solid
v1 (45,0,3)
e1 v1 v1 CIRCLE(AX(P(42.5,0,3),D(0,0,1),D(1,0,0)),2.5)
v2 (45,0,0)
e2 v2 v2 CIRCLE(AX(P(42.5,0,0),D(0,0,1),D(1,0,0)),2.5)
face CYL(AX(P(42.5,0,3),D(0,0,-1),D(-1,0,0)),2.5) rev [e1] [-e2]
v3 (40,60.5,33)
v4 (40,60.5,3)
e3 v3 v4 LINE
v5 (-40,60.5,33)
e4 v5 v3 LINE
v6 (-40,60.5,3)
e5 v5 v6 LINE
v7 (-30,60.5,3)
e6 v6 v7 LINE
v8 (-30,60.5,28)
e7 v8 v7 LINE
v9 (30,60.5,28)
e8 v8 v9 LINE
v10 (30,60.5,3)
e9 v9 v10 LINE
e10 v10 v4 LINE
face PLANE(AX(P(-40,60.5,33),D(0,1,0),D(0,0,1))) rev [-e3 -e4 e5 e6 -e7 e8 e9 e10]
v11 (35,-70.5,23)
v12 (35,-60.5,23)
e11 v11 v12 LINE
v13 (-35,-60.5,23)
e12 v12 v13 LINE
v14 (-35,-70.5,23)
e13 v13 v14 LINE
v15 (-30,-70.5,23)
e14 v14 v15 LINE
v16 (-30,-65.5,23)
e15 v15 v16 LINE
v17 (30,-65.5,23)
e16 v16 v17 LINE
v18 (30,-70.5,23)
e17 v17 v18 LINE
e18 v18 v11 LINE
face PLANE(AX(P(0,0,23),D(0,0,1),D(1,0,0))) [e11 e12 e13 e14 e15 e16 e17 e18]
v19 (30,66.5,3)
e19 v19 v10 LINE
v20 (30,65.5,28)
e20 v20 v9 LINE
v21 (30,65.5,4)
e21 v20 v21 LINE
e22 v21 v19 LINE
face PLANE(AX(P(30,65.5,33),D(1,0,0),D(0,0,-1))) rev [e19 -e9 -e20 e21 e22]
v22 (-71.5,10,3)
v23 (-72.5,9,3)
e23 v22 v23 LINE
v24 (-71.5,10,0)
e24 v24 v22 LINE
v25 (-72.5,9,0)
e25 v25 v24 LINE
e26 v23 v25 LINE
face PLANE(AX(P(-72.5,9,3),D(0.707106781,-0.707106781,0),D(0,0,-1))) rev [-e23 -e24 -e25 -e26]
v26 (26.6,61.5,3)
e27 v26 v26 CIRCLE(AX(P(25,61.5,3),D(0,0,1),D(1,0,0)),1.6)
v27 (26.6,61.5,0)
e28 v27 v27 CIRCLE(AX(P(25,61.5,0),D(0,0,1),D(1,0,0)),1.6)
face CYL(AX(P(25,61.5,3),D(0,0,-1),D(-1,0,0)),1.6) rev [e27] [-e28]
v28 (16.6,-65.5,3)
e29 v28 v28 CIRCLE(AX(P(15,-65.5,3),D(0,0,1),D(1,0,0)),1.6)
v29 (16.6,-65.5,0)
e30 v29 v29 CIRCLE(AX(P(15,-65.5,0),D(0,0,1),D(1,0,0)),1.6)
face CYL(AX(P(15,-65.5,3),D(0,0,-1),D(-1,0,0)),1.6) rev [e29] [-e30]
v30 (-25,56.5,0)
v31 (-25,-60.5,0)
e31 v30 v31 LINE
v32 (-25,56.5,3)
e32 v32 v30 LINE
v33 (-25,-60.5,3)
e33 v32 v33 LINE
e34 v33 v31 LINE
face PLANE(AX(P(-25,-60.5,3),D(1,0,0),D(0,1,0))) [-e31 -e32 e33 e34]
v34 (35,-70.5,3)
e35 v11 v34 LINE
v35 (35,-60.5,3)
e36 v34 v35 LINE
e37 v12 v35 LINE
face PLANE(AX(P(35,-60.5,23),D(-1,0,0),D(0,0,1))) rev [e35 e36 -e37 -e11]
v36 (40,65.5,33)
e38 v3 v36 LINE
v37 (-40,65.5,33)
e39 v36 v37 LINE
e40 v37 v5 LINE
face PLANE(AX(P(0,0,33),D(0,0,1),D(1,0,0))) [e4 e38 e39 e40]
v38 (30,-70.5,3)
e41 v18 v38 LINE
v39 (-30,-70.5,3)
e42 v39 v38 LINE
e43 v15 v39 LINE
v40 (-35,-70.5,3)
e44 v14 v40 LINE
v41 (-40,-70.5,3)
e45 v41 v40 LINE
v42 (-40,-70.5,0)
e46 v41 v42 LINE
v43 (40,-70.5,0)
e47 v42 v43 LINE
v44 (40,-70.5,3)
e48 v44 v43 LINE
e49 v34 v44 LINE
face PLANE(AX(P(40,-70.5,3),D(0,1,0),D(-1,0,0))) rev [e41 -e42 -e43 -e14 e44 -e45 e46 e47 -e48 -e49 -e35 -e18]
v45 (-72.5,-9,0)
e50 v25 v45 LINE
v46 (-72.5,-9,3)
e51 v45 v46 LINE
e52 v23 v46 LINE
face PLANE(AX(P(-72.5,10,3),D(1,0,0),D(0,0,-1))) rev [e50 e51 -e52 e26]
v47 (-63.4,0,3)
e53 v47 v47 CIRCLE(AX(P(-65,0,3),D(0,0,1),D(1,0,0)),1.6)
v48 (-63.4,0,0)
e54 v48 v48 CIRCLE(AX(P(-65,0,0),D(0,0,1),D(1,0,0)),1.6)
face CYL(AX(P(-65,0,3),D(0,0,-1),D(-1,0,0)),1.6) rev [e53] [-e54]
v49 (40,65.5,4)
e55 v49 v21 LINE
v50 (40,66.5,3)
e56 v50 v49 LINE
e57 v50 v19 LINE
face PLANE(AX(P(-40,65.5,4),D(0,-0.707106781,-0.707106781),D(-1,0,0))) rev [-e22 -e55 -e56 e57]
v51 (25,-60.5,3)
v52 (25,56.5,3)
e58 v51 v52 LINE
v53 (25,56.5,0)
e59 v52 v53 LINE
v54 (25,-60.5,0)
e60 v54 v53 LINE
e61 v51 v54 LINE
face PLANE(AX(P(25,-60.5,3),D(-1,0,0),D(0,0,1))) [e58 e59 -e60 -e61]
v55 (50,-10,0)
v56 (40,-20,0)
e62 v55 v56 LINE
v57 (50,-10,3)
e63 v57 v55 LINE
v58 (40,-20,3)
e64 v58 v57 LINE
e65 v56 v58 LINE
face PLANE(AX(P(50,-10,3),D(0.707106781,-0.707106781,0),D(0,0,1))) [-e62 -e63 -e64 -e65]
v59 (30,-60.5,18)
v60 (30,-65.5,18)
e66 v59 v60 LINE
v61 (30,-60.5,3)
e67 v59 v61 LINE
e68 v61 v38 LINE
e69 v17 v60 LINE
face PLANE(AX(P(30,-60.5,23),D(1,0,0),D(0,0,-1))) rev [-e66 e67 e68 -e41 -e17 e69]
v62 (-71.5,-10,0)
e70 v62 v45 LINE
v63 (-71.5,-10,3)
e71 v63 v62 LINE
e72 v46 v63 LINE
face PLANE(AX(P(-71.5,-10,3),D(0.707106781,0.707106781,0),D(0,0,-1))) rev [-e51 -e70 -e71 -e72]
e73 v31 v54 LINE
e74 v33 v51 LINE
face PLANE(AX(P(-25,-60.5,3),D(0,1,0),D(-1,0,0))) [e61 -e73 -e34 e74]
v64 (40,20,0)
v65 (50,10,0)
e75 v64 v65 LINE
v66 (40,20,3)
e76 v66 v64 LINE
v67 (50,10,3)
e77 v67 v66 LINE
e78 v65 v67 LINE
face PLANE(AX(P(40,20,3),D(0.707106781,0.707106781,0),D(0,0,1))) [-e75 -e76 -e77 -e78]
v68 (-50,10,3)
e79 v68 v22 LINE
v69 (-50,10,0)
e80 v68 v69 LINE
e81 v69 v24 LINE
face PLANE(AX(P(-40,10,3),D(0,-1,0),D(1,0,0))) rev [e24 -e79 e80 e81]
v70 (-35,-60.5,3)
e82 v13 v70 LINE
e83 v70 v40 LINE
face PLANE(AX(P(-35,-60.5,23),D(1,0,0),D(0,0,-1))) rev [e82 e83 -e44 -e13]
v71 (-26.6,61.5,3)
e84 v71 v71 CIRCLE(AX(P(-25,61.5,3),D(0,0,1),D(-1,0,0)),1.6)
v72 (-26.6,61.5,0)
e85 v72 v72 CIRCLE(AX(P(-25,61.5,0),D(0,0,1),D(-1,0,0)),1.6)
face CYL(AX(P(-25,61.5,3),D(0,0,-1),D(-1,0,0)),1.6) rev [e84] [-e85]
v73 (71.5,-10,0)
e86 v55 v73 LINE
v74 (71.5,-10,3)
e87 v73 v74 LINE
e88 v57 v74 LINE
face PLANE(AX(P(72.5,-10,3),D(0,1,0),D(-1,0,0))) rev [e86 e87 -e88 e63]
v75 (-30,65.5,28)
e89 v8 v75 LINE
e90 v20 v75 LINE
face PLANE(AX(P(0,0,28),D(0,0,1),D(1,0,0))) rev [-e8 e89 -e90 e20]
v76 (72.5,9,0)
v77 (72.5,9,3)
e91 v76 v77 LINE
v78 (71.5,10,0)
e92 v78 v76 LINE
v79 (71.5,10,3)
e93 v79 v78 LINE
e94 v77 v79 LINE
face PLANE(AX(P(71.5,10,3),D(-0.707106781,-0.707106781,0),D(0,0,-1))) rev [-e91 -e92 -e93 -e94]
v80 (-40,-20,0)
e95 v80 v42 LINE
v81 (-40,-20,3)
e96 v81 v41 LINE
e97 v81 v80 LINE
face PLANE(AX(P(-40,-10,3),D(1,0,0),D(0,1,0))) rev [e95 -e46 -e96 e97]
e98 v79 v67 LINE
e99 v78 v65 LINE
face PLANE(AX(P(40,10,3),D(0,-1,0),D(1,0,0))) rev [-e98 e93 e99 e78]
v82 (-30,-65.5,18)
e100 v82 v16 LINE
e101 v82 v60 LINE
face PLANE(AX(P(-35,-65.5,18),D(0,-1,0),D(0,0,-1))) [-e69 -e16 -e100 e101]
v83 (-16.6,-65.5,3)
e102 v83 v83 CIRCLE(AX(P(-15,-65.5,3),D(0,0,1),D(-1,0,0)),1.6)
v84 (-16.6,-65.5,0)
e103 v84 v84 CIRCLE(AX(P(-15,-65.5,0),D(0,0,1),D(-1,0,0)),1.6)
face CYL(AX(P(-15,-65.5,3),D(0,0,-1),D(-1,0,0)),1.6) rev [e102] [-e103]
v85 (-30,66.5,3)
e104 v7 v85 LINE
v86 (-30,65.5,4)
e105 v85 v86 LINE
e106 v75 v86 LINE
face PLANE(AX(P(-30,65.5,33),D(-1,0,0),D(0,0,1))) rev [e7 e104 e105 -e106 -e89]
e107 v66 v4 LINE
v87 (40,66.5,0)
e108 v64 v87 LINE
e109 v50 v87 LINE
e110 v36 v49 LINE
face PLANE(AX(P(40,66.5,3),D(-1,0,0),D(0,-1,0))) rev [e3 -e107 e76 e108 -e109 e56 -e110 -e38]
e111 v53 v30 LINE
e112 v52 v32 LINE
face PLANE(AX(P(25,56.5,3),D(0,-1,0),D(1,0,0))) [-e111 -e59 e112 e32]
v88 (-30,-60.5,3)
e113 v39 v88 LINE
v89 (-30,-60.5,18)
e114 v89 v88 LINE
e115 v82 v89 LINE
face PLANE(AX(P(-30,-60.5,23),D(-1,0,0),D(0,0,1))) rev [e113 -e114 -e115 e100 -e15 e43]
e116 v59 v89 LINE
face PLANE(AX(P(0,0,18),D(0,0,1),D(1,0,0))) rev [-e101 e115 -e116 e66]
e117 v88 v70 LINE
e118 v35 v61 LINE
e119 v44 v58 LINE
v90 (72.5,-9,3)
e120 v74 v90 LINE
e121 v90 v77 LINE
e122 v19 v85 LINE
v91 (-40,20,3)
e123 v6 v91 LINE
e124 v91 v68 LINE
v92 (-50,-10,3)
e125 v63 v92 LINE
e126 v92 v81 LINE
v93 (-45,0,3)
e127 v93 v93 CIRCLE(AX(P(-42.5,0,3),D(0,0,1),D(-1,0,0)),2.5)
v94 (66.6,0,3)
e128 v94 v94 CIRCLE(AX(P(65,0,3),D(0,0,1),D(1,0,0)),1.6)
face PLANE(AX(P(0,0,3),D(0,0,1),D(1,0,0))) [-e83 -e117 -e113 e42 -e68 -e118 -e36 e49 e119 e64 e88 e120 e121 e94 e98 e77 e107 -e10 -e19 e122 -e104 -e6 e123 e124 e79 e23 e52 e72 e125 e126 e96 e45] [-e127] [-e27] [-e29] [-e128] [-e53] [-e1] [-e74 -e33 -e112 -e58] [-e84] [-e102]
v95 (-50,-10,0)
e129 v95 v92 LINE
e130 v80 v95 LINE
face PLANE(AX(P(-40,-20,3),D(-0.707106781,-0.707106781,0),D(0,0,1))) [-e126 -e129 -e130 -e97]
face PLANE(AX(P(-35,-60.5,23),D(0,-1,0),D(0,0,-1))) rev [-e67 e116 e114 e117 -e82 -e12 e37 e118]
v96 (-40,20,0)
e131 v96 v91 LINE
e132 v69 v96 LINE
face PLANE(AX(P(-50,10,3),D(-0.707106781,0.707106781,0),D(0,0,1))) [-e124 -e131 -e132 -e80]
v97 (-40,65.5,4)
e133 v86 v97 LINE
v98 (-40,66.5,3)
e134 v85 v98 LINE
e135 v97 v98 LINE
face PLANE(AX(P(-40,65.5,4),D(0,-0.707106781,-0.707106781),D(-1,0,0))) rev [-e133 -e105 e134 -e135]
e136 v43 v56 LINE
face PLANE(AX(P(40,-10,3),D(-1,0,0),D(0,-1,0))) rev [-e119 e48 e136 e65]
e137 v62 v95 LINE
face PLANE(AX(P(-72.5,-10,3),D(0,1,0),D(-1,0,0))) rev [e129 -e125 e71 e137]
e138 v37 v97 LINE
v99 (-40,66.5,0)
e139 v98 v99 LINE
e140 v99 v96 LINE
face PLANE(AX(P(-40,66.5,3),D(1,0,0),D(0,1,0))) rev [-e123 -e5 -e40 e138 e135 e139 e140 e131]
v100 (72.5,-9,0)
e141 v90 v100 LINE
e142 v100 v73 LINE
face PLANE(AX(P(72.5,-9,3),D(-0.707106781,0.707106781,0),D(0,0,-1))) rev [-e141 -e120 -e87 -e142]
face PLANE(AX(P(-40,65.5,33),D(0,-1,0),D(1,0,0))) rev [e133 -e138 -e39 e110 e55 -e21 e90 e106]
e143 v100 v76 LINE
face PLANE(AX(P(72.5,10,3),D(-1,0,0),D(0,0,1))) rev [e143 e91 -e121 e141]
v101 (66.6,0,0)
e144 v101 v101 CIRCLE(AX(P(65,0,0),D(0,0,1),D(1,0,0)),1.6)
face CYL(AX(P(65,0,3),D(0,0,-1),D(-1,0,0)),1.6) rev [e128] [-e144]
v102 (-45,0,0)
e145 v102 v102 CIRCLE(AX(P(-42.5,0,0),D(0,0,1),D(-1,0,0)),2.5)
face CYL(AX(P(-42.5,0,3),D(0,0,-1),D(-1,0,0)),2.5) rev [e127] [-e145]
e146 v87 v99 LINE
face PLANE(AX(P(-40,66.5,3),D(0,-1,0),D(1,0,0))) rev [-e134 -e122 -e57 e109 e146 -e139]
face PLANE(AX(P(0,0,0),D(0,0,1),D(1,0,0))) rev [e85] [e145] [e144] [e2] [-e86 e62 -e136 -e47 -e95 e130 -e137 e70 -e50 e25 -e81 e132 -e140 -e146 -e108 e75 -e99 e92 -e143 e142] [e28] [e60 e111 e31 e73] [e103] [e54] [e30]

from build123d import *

# Parameters (mm, degrees)
SKETCH_9_R       = 1.6
SKETCH_9_R_2     = 2.5
SKETCH_9_W       = 50
SKETCH_9_H       = 117
EXTRUDE_7_DEPTH  = 3
SKETCH_10_W      = 10
SKETCH_10_H      = 5
EXTRUDE_8_DEPTH  = 30
SKETCH_11_W      = 5
SKETCH_11_H      = 10
EXTRUDE_9_DEPTH  = 20
SKETCH_12_W      = 80
SKETCH_12_H      = 5
EXTRUDE_10_DEPTH = 5
SKETCH_14_W      = 70
SKETCH_14_H      = 5
EXTRUDE_11_DEPTH = 5
CHAMFER_2_SIZE   = 1
CHAMFER_3_SIZE   = 10


with BuildPart() as part:
    # 草图9 → 凸台-拉伸7 (new body)
    with BuildSketch(Plane.XY):
        Polygon((-40, 66.5), (40, 66.5), (40, 10), (72.5, 10), (72.5, -10), (40, -10), (40, -70.5), (-40, -70.5), (-40, -10), (-72.5, -10), (-72.5, 10), (-40, 10), align=None)
        with Locations((25, 61.5)):
            Circle(SKETCH_9_R, mode=Mode.SUBTRACT)
        with Locations((15, -65.5)):
            Circle(SKETCH_9_R, mode=Mode.SUBTRACT)
        with Locations((42.5, 0)):
            Circle(SKETCH_9_R_2, mode=Mode.SUBTRACT)
        with Locations(Location((-42.5, 0, 0), (0, 0, 180))):
            Circle(SKETCH_9_R_2, mode=Mode.SUBTRACT)
        with Locations(Location((-15, -65.5, 0), (0, 0, 180))):
            Circle(SKETCH_9_R, mode=Mode.SUBTRACT)
        with Locations(Location((-25, 61.5, 0), (0, 0, 180))):
            Circle(SKETCH_9_R, mode=Mode.SUBTRACT)
        with Locations((-65, 0)):
            Circle(SKETCH_9_R, mode=Mode.SUBTRACT)
        with Locations((65, 0)):
            Circle(SKETCH_9_R, mode=Mode.SUBTRACT)
        with Locations((0, -2)):
            Rectangle(SKETCH_9_W, SKETCH_9_H, mode=Mode.SUBTRACT)
    extrude(amount=EXTRUDE_7_DEPTH)

    # 草图10 → 凸台-拉伸8 (add)
    with BuildSketch(Plane.XY.offset(3)):
        with Locations((-35, 63)):
            Rectangle(SKETCH_10_W, SKETCH_10_H)
        with Locations((35, 63)):
            Rectangle(SKETCH_10_W, SKETCH_10_H)
    extrude(amount=EXTRUDE_8_DEPTH)

    # 草图11 → 凸台-拉伸9 (add)
    with BuildSketch(Plane.XY.offset(3)):
        with Locations((-32.5, -65.5)):
            Rectangle(SKETCH_11_W, SKETCH_11_H)
        with Locations((32.5, -65.5)):
            Rectangle(SKETCH_11_W, SKETCH_11_H)
    extrude(amount=EXTRUDE_9_DEPTH)

    # 草图12 → 凸台-拉伸10 (add)
    with BuildSketch(Plane.XY.offset(33)):
        with Locations((0, 63)):
            Rectangle(SKETCH_12_W, SKETCH_12_H)
    extrude(amount=-EXTRUDE_10_DEPTH)

    # 草图14 → 凸台-拉伸11 (add)
    with BuildSketch(Plane.XY.offset(23)):
        with Locations((0, -63)):
            Rectangle(SKETCH_14_W, SKETCH_14_H)
    extrude(amount=-EXTRUDE_11_DEPTH)

    # 倒角2
    chamfer_2_edges = [part.edges().sort_by_distance(p)[0] for p in [
        (35, 65.5, 3),
        (-35, 65.5, 3),
        (72.5, -10, 1.5),
        (72.5, 10, 1.5),
        (-72.5, -10, 1.5),
        (-72.5, 10, 1.5),
    ]]
    chamfer(chamfer_2_edges, length=CHAMFER_2_SIZE - 0.0001)  # a hair under: the kernel refuses the full size

    # 倒角3
    chamfer_3_edges = [part.edges().sort_by_distance(p)[0] for p in [
        (40, 10, 1.5),
        (40, -10, 1.5),
        (-40, -10, 1.5),
        (-40, 10, 1.5),
    ]]
    chamfer(chamfer_3_edges, length=CHAMFER_3_SIZE)


solid = part.part
